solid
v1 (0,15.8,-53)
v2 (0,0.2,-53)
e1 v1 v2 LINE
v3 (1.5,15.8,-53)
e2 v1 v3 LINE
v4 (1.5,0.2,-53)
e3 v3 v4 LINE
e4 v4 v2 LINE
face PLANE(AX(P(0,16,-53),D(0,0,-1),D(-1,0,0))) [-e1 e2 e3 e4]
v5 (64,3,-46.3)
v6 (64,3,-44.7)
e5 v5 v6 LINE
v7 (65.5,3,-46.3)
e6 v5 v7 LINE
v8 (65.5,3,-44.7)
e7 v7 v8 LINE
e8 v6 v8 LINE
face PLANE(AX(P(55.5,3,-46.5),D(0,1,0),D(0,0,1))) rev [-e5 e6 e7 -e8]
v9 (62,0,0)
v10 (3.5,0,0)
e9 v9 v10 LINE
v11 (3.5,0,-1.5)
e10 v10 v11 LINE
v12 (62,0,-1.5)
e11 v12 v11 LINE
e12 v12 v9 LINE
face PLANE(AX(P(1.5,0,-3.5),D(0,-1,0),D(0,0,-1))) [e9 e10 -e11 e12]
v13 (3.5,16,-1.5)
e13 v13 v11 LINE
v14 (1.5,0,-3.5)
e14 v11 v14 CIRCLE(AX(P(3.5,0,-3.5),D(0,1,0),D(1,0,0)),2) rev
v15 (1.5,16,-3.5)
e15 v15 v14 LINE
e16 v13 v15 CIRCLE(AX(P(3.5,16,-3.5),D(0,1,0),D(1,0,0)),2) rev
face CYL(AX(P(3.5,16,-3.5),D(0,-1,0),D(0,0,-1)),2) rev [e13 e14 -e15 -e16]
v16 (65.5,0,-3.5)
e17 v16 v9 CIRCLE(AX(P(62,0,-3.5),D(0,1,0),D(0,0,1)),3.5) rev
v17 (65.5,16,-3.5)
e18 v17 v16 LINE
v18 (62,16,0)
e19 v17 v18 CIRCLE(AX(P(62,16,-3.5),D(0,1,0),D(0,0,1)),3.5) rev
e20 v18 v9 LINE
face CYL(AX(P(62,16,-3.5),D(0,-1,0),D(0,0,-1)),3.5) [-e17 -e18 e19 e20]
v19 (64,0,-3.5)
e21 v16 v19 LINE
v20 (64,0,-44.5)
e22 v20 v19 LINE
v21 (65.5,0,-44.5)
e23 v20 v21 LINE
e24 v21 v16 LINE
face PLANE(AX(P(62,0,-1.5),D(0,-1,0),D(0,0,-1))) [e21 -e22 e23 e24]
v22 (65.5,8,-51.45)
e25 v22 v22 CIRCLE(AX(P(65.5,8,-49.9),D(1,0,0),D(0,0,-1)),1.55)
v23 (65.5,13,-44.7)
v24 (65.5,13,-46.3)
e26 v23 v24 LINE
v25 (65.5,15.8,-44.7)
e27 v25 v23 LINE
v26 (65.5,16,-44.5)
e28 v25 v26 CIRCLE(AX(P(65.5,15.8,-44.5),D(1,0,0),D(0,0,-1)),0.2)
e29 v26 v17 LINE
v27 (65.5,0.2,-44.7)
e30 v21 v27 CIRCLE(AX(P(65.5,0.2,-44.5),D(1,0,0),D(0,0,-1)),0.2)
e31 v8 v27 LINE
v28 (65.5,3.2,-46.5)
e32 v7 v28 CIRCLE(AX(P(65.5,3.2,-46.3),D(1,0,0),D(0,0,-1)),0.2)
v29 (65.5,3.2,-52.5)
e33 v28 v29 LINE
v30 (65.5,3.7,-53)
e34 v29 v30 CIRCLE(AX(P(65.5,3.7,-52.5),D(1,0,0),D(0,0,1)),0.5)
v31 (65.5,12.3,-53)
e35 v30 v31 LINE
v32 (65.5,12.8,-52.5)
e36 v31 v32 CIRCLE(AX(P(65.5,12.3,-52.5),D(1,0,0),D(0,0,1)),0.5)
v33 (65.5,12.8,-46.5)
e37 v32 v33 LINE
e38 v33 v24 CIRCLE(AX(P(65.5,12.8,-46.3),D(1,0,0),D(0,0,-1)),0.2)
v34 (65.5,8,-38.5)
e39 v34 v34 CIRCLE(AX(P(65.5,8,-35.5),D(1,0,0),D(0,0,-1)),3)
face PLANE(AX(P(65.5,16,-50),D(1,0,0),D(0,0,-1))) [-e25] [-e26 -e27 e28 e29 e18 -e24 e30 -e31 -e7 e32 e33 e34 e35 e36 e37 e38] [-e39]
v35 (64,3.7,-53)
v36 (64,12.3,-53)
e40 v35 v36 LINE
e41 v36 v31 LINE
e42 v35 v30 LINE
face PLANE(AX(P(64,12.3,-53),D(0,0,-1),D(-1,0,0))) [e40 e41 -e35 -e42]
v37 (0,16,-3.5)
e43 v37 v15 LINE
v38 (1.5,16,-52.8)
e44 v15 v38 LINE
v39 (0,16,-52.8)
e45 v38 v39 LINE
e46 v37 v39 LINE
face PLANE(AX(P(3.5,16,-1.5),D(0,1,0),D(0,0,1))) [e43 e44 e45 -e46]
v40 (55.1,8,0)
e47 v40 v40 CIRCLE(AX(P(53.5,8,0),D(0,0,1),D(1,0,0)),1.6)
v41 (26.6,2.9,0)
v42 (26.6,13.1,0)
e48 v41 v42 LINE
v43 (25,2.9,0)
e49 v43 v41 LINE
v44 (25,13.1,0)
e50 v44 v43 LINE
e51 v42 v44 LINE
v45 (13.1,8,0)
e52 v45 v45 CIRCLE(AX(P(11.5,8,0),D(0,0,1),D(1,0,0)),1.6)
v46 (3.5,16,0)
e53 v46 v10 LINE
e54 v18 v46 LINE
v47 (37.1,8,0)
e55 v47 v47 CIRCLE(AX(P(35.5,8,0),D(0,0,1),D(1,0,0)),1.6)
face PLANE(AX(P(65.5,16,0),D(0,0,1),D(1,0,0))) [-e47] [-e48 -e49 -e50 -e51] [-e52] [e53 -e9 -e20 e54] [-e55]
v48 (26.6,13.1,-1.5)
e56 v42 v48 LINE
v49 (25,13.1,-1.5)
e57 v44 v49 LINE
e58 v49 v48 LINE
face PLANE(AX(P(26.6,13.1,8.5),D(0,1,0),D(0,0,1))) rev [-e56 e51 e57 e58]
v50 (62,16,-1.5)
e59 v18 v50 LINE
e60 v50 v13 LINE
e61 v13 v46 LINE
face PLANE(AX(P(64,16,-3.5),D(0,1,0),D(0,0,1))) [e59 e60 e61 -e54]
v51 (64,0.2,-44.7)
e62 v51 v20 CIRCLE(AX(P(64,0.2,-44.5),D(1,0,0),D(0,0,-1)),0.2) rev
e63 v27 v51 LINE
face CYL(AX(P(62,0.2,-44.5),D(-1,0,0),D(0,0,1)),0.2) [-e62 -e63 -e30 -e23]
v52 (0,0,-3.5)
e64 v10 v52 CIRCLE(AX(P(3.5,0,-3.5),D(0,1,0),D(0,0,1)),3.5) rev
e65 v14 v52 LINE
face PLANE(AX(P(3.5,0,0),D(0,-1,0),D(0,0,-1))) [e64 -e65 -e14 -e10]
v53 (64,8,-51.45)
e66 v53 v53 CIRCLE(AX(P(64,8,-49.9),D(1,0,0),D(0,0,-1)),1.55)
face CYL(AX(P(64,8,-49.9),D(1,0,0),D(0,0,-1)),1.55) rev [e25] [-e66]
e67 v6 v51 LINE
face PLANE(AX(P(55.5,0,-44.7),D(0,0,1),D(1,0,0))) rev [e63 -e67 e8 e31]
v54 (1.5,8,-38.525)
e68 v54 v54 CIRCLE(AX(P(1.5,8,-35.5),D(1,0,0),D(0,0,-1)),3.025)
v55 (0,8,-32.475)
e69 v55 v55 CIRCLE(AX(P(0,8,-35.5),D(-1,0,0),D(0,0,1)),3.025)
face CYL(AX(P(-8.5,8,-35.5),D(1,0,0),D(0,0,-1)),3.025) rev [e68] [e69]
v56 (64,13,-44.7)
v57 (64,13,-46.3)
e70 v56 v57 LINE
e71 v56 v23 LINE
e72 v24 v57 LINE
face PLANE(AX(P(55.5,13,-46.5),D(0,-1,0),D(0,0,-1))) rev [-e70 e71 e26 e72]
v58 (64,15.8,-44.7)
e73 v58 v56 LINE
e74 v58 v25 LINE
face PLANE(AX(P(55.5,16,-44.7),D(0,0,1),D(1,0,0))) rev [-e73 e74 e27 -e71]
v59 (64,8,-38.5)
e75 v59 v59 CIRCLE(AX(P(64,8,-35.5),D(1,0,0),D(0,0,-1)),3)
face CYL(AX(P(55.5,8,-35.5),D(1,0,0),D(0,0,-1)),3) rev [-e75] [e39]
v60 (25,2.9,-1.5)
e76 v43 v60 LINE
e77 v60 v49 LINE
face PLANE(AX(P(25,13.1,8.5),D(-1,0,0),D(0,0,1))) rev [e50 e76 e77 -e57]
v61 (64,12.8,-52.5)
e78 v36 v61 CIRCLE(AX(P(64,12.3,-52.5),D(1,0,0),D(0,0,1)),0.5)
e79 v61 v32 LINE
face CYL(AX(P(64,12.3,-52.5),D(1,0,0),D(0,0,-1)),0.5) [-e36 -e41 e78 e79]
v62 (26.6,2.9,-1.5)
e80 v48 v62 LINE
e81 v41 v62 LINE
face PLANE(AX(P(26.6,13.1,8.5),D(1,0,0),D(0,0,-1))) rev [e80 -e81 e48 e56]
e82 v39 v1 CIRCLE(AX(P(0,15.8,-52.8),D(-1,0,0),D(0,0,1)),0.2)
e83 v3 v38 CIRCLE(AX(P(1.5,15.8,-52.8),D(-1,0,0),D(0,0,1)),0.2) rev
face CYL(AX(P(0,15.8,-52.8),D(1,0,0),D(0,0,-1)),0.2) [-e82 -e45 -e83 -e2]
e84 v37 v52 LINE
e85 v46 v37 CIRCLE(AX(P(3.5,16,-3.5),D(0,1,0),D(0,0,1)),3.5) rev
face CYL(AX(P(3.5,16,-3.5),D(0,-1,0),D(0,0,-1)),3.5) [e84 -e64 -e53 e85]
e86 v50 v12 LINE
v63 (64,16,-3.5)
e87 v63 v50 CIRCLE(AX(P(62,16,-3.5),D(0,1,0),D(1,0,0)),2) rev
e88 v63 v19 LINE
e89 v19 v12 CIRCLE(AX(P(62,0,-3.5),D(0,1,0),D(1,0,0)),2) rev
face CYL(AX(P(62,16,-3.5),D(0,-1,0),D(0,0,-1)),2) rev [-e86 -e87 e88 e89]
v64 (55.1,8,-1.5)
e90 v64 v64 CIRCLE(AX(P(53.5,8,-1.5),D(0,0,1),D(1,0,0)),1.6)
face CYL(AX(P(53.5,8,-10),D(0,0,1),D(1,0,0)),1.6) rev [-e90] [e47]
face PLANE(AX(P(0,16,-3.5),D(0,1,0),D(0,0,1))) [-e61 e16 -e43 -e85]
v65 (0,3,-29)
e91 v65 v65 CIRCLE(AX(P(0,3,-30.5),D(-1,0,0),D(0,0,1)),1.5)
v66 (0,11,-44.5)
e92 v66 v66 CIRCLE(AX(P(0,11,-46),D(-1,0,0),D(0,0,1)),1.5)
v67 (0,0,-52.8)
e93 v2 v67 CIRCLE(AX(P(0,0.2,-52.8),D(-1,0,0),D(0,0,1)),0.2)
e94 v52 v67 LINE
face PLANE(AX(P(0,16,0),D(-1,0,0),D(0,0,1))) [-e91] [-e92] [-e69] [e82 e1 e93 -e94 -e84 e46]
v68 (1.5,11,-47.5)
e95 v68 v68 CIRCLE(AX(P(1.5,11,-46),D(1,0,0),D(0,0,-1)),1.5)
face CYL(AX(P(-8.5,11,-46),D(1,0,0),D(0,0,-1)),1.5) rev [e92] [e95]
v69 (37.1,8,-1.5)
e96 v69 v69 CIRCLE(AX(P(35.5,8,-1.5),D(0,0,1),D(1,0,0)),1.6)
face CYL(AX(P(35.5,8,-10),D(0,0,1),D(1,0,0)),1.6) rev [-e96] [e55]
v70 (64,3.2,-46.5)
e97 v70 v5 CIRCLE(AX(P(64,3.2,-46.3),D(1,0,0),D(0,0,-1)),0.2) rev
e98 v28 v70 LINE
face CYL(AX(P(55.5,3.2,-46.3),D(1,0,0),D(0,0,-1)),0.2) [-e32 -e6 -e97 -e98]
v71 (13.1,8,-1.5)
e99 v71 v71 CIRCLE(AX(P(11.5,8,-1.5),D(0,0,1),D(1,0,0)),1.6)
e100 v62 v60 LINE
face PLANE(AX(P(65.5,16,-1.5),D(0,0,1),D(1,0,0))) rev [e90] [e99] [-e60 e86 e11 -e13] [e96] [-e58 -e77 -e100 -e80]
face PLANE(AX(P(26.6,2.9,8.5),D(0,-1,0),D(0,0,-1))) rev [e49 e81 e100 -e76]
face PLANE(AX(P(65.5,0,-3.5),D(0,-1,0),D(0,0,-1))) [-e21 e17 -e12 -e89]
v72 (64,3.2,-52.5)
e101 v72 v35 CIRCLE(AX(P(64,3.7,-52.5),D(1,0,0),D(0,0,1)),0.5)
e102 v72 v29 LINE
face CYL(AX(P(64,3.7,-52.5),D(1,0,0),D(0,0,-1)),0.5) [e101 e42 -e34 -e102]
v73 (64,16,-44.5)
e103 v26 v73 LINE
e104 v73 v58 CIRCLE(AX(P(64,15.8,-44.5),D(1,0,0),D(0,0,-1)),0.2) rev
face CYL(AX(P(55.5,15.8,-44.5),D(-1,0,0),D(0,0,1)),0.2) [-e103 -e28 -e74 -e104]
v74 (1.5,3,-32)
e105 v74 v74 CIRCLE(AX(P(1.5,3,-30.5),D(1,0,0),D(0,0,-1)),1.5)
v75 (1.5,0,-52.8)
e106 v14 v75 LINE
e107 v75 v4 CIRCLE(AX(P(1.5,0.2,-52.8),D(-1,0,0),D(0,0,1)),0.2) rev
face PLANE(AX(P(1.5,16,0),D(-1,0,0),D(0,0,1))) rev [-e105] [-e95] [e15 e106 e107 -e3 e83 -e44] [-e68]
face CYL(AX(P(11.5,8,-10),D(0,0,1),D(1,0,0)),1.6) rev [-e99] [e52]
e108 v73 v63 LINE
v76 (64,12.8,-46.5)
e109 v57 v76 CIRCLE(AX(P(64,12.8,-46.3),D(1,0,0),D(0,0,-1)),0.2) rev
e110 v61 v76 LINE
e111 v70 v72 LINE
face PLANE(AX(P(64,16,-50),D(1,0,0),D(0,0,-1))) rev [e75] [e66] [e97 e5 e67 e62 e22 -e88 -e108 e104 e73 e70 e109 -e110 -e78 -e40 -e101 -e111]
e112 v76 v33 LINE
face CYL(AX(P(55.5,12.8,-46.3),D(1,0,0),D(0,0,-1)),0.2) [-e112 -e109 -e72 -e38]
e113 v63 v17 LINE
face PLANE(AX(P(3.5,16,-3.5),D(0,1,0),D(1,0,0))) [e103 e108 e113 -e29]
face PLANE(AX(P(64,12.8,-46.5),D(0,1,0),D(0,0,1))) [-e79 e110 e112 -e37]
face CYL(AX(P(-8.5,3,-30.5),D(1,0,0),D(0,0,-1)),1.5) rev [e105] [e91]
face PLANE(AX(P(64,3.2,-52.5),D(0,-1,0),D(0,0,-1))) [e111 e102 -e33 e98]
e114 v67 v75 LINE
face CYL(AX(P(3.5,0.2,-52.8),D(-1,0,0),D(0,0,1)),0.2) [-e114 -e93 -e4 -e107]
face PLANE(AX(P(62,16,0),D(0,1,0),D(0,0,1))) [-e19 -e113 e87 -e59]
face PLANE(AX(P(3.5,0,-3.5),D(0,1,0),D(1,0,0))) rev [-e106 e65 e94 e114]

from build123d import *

# Parameters (mm, degrees)
BASE_FLANGE1_DEPTH = 16
SKETCH6_W          = 1.6
SKETCH6_H          = 10.2
CUT_EXTRUDE1_DEPTH = 10
SKETCH7_R          = 3
CUT_EXTRUDE2_DEPTH = 10
CUT_EXTRUDE3_DEPTH = 10
FILLET1_R          = 0.2
SKETCH11_R         = 1.55
TAB1_DEPTH         = 1.5
SKETCH15_R         = 1.6
CUT_EXTRUDE6_DEPTH = 10
SKETCH9_R          = 3.025
SKETCH9_R_2        = 1.5
CUT_EXTRUDE4_DEPTH = 10


# Sheet-metal steps are written as plain solids
with BuildPart() as part:
    # Sketch1 → Base-Flange1 (new body)
    with BuildSketch(Plane(origin=(0, 0, 0), x_dir=(1, 0, 0), z_dir=(0, 1, 0))):
        with BuildLine():
            Line((65.5, 50), (65.5, 3.5))
            ThreePointArc((65.5, 3.5), (64.474873734, 1.025126266), (62, 0))
            Line((62, 0), (3.5, 0))
            ThreePointArc((3.5, 0), (1.025126266, 1.025126266), (0, 3.5))
            Line((0, 3.5), (0, 53))
            Line((0, 53), (1.5, 53))
            Line((1.5, 53), (1.5, 3.5))
            ThreePointArc((1.5, 3.5), (2.085786438, 2.085786438), (3.5, 1.5))
            Line((3.5, 1.5), (62, 1.5))
            ThreePointArc((62, 1.5), (63.414213562, 2.085786438), (64, 3.5))
            Line((64, 3.5), (64, 50))
            Line((64, 50), (65.5, 50))
        make_face()
    extrude(amount=BASE_FLANGE1_DEPTH)

    # Sketch6 → Cut-Extrude1 (cut)
    with BuildSketch(Plane(origin=(0, 0, -1.5), x_dir=(-1, 0, 0), z_dir=(0, 0, -1))):
        with Locations((-25.8, 8)):
            Rectangle(SKETCH6_W, SKETCH6_H)
    extrude(amount=-CUT_EXTRUDE1_DEPTH, mode=Mode.SUBTRACT)

    # Sketch7 → Cut-Extrude2 (cut)
    with BuildSketch(Plane(origin=(65.5, 0, 0), x_dir=(0, 0, -1), z_dir=(1, 0, 0))):
        with Locations((35.5, 8)):
            Circle(SKETCH7_R)
    extrude(amount=-CUT_EXTRUDE2_DEPTH, mode=Mode.SUBTRACT)

    # Sketch8 → Cut-Extrude3 (cut)
    with BuildSketch(Plane(origin=(65.5, 0, 0), x_dir=(0, 0, -1), z_dir=(1, 0, 0))):
        Polygon((50, 16), (44.7, 16), (44.7, 13), (46.5, 13), (46.5, 3), (44.7, 3), (44.7, 0), (50, 0), (53, 0), (53, 16), align=None)
    extrude(amount=-CUT_EXTRUDE3_DEPTH, mode=Mode.SUBTRACT)

    # Fillet1
    fillet1_edges = [part.edges().sort_by_distance(p)[0] for p in [
        (0.75, 0, -53),
        (0.75, 16, -53),
        (64.75, 16, -44.7),
        (64.75, 0, -44.7),
        (64.75, 3, -46.5),
        (64.75, 13, -46.5),
    ]]
    fillet(fillet1_edges, radius=FILLET1_R)

    # Sketch11 → Tab1 (add)
    with BuildSketch(Plane(origin=(65.5, 0, 0), x_dir=(0, 0, -1), z_dir=(1, 0, 0))):
        with BuildLine():
            Line((46.5, 12.8), (52.5, 12.8))
            ThreePointArc((52.5, 12.8), (52.853553391, 12.653553391), (53, 12.3))
            Line((53, 12.3), (53, 3.7))
            ThreePointArc((53, 3.7), (52.853553391, 3.346446609), (52.5, 3.2))
            Line((52.5, 3.2), (46.5, 3.2))
            Line((46.5, 3.2), (46.5, 12.8))
        make_face()
        with Locations((49.9, 8)):
            Circle(SKETCH11_R, mode=Mode.SUBTRACT)
    extrude(amount=-TAB1_DEPTH)

    # Sketch15 → Cut-Extrude6 (cut)
    with BuildSketch(Plane.XY):
        with Locations((35.5, 8)):
            Circle(SKETCH15_R)
        with Locations((53.5, 8)):
            Circle(SKETCH15_R)
        with Locations((11.5, 8)):
            Circle(SKETCH15_R)
    extrude(amount=-CUT_EXTRUDE6_DEPTH, mode=Mode.SUBTRACT)

    # Sketch9 → Cut-Extrude4 (cut)
    with BuildSketch(Plane(origin=(1.5, 0, 0), x_dir=(0, 0, -1), z_dir=(1, 0, 0))):
        with Locations((35.5, 8)):
            Circle(SKETCH9_R)
        with Locations((30.5, 3)):
            Circle(SKETCH9_R_2)
        with Locations((46, 11)):
            Circle(SKETCH9_R_2)
    extrude(amount=-CUT_EXTRUDE4_DEPTH, mode=Mode.SUBTRACT)


solid = part.part
